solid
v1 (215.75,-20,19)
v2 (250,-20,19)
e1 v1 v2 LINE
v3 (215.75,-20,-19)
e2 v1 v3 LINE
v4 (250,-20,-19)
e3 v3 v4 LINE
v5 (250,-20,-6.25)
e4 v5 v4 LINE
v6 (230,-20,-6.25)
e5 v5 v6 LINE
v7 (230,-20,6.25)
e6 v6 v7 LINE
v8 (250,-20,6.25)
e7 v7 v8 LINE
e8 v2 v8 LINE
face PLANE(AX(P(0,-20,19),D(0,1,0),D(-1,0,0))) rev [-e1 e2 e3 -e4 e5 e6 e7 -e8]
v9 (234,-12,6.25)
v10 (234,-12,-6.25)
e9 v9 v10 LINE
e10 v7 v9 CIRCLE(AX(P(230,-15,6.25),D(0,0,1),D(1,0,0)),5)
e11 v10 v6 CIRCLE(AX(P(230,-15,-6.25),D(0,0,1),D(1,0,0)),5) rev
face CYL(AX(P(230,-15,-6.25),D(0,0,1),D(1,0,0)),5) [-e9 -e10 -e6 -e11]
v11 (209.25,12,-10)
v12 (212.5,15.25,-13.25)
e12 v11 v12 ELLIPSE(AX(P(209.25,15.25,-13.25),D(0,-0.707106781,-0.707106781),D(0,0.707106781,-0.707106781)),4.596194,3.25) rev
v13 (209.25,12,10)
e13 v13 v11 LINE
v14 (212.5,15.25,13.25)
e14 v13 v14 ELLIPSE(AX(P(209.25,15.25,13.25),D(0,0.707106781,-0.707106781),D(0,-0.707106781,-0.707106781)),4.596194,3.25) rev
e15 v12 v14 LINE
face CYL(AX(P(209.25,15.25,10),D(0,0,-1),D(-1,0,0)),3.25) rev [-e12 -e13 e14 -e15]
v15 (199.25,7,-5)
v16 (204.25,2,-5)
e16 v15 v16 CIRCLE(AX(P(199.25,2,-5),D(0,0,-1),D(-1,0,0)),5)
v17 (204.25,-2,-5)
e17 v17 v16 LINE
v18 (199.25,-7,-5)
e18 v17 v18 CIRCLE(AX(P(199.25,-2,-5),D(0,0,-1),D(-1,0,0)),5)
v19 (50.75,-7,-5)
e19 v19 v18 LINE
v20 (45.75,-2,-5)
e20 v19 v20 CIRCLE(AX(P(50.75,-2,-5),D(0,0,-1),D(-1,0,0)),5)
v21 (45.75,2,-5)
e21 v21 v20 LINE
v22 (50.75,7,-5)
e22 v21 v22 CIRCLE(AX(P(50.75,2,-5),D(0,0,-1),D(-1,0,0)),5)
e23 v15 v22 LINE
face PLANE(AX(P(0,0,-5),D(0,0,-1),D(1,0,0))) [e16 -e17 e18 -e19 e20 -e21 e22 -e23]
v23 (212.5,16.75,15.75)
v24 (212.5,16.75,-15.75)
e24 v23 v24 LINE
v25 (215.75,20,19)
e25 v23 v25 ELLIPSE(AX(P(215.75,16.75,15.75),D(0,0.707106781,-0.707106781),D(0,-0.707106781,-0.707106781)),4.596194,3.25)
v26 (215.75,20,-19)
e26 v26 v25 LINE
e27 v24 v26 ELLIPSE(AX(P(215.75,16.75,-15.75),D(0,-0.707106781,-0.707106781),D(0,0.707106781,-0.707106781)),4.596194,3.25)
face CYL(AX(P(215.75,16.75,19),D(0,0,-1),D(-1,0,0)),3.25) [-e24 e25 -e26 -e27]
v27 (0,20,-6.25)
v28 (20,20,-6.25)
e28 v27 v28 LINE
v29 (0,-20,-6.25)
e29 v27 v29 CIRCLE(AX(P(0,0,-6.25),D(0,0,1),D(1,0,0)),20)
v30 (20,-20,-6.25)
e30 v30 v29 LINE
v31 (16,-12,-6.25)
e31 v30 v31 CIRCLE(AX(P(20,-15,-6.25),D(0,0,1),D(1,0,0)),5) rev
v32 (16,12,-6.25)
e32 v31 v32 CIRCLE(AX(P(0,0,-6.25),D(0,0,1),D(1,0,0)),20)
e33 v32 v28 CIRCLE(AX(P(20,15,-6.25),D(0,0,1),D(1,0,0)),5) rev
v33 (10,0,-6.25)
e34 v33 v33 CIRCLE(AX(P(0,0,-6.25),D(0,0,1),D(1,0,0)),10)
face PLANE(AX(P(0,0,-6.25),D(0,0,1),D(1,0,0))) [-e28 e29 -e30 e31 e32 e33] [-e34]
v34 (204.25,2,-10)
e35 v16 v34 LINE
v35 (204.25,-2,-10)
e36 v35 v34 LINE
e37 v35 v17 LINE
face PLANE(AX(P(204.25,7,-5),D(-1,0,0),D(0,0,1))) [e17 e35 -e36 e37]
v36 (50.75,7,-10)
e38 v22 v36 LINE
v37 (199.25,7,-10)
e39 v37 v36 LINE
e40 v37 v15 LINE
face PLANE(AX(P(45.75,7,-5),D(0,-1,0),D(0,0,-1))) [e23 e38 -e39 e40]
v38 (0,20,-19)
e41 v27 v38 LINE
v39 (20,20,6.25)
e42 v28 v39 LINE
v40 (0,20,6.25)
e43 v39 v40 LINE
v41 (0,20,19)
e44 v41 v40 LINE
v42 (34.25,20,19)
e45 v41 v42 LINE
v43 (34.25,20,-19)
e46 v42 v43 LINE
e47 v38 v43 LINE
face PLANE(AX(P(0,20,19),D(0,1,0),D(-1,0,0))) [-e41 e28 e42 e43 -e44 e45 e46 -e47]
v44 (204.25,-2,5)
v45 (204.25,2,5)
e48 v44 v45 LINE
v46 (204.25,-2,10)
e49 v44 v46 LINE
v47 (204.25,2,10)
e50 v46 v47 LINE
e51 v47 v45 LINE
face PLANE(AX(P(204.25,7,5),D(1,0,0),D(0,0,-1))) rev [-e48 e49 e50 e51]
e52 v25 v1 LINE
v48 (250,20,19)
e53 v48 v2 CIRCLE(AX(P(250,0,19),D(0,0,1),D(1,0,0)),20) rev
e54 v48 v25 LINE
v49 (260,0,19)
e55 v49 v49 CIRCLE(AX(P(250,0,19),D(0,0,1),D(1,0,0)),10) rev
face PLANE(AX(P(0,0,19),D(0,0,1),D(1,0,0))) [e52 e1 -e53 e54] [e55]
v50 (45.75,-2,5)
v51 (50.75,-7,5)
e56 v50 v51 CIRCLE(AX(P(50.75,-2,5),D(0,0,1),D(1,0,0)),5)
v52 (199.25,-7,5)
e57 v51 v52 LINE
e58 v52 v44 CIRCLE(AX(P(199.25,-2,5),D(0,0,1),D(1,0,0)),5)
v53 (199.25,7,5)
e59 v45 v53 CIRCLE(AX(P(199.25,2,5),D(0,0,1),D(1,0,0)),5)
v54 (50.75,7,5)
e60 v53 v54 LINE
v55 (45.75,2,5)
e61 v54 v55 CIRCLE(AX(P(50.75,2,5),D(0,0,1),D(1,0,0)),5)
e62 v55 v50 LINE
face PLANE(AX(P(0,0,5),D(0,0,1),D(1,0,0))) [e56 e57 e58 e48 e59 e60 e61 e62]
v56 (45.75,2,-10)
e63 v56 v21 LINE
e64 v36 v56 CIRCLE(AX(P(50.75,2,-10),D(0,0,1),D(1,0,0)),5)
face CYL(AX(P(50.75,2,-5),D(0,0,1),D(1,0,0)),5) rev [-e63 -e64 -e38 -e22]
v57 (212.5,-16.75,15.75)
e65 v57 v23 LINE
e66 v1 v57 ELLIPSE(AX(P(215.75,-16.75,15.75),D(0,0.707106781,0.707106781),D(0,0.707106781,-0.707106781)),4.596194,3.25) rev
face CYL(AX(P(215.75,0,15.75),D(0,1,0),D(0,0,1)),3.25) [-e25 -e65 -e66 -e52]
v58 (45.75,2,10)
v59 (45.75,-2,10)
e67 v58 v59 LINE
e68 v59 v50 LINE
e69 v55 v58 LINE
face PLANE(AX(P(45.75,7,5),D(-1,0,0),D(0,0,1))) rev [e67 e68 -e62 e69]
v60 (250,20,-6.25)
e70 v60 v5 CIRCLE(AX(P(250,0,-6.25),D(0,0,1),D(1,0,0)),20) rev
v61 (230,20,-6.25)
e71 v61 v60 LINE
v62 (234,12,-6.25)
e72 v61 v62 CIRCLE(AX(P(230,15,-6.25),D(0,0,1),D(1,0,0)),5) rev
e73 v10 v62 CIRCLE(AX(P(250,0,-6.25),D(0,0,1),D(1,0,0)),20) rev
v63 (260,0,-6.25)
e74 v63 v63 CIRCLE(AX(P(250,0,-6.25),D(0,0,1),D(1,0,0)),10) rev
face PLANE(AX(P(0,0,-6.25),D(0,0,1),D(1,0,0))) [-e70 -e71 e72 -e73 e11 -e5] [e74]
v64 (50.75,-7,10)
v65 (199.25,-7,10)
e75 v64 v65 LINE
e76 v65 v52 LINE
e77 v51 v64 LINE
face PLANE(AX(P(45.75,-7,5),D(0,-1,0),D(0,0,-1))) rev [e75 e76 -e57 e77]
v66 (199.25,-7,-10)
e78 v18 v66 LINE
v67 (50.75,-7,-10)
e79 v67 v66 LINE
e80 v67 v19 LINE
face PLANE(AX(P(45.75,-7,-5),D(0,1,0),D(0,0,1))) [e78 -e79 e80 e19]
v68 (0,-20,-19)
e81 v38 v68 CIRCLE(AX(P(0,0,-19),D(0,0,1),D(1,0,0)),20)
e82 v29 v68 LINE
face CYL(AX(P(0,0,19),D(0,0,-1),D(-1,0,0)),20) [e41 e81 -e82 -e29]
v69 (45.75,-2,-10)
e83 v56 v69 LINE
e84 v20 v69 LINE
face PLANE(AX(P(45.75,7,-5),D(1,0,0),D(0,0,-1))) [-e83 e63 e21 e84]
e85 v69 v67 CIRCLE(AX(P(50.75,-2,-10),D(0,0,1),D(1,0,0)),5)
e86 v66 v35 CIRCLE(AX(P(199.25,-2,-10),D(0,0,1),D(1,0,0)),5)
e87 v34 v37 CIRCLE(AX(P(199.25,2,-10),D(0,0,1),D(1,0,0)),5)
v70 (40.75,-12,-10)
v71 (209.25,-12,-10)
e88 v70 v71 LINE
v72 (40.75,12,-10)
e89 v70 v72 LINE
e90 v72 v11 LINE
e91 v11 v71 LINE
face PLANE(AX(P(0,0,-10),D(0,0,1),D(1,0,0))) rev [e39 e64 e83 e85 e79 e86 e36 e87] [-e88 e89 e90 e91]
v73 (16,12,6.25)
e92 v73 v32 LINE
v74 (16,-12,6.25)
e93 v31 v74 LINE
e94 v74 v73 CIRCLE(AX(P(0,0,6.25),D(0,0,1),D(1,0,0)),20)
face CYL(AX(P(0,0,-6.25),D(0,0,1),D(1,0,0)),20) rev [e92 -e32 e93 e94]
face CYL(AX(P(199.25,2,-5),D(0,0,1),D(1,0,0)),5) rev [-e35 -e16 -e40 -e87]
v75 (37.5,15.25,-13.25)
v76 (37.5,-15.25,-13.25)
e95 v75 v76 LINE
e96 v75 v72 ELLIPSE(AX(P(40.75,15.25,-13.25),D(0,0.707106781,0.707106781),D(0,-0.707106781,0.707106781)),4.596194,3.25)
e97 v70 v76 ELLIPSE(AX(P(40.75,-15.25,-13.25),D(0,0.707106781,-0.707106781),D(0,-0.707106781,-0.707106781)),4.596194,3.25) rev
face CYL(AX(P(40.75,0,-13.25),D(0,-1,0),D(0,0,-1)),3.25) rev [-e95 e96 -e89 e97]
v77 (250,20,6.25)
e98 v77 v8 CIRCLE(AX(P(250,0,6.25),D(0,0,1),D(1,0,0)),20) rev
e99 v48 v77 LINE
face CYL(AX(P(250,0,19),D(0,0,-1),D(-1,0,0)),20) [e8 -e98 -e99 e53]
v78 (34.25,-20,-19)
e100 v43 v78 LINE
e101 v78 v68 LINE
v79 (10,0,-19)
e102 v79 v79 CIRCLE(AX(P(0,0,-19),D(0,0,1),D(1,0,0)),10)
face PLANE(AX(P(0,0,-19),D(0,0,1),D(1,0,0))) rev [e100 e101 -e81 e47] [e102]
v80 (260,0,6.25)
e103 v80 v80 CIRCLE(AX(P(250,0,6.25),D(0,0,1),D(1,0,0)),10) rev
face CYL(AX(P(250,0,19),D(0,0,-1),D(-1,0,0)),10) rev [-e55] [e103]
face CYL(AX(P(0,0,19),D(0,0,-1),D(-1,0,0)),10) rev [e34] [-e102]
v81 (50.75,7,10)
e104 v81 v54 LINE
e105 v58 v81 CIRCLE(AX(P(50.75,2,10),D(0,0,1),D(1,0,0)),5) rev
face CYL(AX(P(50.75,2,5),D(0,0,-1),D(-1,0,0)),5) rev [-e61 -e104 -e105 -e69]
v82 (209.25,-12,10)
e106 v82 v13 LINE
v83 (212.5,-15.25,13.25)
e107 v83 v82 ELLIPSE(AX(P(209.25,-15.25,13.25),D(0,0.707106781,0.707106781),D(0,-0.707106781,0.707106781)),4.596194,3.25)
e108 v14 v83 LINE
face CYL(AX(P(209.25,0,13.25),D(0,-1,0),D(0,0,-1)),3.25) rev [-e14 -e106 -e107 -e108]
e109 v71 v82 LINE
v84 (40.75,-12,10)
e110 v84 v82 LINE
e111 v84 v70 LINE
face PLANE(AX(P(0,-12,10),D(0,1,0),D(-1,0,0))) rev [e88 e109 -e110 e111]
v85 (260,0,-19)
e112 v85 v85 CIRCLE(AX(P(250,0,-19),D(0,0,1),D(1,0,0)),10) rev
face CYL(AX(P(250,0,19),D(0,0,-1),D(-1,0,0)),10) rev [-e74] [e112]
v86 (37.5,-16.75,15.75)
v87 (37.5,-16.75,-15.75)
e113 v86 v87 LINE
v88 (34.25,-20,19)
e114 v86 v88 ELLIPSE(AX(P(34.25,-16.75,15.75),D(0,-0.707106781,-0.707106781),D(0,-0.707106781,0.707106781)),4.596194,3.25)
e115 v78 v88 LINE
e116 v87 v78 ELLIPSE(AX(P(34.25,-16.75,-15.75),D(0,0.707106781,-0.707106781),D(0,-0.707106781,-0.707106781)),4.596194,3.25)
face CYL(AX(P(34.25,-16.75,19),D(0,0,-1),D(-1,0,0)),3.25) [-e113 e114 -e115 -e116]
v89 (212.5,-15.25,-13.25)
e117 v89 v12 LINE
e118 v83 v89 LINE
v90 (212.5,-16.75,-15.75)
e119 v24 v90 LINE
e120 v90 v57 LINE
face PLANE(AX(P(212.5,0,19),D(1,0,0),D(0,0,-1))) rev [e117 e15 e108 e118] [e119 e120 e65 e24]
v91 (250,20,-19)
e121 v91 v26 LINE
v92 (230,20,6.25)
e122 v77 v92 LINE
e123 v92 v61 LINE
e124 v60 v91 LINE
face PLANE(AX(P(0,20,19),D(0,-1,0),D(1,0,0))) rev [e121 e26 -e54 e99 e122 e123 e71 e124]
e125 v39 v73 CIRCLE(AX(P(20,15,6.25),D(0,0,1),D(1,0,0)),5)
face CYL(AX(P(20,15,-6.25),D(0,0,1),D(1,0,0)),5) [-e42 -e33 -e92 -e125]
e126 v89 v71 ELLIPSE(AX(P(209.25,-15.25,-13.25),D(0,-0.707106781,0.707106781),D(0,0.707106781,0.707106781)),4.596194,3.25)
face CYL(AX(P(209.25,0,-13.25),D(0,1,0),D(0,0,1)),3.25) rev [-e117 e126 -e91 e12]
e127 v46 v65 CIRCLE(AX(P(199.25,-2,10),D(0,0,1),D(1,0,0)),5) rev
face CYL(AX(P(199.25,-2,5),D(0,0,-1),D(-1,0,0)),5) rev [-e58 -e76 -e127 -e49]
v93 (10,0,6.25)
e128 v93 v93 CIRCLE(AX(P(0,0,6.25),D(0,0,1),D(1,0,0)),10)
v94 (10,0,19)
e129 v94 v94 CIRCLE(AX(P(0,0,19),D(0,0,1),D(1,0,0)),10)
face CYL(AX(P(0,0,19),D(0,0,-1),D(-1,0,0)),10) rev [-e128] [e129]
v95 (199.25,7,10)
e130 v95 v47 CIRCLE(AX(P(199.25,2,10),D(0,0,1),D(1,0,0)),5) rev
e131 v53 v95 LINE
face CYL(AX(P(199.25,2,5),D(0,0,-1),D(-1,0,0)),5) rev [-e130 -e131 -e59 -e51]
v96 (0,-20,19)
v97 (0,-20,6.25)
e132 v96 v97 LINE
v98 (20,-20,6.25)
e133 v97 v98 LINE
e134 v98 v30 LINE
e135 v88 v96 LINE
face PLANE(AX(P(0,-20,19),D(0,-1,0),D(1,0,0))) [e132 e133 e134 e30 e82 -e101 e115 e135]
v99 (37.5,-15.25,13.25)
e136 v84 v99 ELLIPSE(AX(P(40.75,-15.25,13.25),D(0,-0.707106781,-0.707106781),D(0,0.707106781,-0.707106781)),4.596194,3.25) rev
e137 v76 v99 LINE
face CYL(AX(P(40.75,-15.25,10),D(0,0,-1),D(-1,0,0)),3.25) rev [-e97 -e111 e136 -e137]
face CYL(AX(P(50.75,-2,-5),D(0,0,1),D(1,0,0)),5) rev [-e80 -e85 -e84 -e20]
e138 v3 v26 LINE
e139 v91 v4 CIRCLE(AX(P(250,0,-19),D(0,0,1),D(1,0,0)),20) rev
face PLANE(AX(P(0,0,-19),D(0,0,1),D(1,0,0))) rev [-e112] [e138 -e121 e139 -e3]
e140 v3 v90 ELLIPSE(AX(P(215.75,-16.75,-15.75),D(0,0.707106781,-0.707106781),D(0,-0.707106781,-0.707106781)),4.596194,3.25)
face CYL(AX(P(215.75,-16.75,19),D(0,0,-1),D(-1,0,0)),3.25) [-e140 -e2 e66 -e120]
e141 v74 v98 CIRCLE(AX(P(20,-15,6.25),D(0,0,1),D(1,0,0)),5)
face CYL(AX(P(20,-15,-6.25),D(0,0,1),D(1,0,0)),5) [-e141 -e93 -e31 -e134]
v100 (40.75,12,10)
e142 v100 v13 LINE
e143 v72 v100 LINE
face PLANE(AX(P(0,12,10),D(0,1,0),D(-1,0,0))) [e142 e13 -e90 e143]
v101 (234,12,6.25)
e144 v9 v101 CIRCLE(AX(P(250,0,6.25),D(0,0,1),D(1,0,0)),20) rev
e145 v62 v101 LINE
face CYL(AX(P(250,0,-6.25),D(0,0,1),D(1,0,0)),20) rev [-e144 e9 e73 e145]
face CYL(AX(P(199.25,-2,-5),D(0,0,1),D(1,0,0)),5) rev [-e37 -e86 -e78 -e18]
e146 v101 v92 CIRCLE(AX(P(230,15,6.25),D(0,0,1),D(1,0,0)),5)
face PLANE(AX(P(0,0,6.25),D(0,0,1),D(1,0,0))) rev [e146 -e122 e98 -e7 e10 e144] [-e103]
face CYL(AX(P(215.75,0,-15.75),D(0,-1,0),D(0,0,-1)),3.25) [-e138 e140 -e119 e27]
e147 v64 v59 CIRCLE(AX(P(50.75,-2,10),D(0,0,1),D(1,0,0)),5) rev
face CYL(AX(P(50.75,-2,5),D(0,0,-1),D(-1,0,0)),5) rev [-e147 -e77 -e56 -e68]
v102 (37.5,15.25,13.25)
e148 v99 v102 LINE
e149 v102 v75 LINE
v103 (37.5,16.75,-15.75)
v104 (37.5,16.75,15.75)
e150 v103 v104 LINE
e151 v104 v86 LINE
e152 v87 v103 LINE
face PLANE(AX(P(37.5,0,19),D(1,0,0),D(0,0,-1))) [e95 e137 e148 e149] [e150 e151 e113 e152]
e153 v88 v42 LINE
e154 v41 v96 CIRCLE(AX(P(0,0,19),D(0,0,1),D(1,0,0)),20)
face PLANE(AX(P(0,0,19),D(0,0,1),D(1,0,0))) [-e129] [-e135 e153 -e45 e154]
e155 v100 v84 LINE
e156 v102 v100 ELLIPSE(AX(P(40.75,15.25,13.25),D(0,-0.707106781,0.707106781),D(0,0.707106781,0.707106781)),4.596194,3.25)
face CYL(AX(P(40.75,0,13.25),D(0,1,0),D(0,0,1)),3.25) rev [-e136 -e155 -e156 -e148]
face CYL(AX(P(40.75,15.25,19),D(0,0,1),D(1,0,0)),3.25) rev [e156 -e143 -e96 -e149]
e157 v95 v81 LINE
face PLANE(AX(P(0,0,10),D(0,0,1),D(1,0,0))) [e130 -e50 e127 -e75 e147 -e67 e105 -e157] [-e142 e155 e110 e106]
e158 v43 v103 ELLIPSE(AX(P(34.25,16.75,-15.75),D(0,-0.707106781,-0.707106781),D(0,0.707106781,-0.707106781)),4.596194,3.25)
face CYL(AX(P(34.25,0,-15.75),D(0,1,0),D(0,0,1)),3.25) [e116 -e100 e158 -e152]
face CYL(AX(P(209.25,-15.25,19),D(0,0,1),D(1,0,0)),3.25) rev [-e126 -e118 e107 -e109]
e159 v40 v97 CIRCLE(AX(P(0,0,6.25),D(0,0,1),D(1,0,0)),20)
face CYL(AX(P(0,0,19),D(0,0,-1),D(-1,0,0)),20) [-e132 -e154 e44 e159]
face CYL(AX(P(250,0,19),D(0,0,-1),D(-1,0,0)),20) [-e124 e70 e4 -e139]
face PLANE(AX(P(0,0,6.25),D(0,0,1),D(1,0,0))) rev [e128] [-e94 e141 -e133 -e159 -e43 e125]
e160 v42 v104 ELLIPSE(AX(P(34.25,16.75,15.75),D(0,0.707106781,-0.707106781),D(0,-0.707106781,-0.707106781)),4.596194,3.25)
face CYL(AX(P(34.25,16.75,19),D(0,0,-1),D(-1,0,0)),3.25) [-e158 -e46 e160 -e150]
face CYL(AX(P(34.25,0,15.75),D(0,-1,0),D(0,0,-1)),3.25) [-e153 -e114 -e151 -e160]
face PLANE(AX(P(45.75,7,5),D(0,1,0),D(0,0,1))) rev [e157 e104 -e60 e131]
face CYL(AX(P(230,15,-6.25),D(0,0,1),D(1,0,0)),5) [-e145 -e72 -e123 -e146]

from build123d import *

# Parameters (mm, degrees)
SKETCH1_W            = 175
SKETCH1_H            = 24
BOSS_EXTRUDE3_DEPTH  = 10
SKETCH1_6_R          = 20
SKETCH1_6_R_2        = 10
HEAD_WIDTH_DEPTH     = 19
SKETCH1_7_R          = 20
SKETCH1_7_R_2        = 10
CUT_EXTRUDE1_DEPTH   = 6.25
FILLET1_START        = -6.25
FILLET1_DEPTH        = 12.5
FILLET2_R            = 3.25
SKETCH2_W            = 158.5
SKETCH2_H            = 14
CUT_EXTRUDE2_DEPTH   = 5
FILLET3_R            = 5
FILLET3_OF_MIRROR1_R = 5


with BuildPart() as part:
    # Sketch1 → Boss-Extrude3 (new, symmetric)
    with BuildSketch(Plane.XY):
        with Locations((125, 0)):
            Rectangle(SKETCH1_W, SKETCH1_H)
    extrude(amount=BOSS_EXTRUDE3_DEPTH, both=True)

    # Sketch1<6> → Head Width (add, symmetric)
    # profile 1 of 4: a face of its own
    with BuildSketch(Plane.XY):
        with BuildLine():
            Line((37.5, -12), (37.5, 12))
            Line((37.5, 12), (37.5, 20))
            Line((37.5, 20), (0, 20))
            ThreePointArc((0, 20), (14.142135624, 14.142135624), (20, 0))
            ThreePointArc((20, 0), (14.142135624, -14.142135624), (0, -20))
            Line((0, -20), (37.5, -20))
            Line((37.5, -20), (37.5, -12))
        make_face()
    # profile 2 of 4: a face of its own
    with BuildSketch(Plane.XY):
        Circle(SKETCH1_6_R)
        Circle(SKETCH1_6_R_2, mode=Mode.SUBTRACT)
    # profile 3 of 4: a face of its own
    with BuildSketch(Plane.XY):
        with BuildLine():
            Line((212.5, 20), (212.5, 12))
            Line((212.5, 12), (212.5, -12))
            Line((212.5, -12), (212.5, -20))
            Line((212.5, -20), (250, -20))
            ThreePointArc((250, -20), (230, 0), (250, 20))
            Line((250, 20), (212.5, 20))
        make_face()
    # profile 4 of 4: a face of its own
    with BuildSketch(Plane.XY):
        with Locations((250, 0)):
            Circle(SKETCH1_6_R)
        with Locations((250, 0)):
            Circle(SKETCH1_6_R_2, mode=Mode.SUBTRACT)
    extrude(amount=HEAD_WIDTH_DEPTH, both=True)

    # Sketch1<7> → Cut-Extrude1 (cut, symmetric)
    # profile 1 of 2: a face of its own
    with BuildSketch(Plane.XY):
        Circle(SKETCH1_7_R)
        Circle(SKETCH1_7_R_2, mode=Mode.SUBTRACT)
    # profile 2 of 2: a face of its own
    with BuildSketch(Plane.XY):
        with Locations((250, 0)):
            Circle(SKETCH1_7_R)
        with Locations((250, 0)):
            Circle(SKETCH1_7_R_2, mode=Mode.SUBTRACT)
    extrude(amount=CUT_EXTRUDE1_DEPTH, both=True, mode=Mode.SUBTRACT)

    # Fillet1: read off the stored shape, not the designer's step
    # Fillet1 outline → Fillet1 (cut)
    with BuildSketch(Plane.XY.offset(FILLET1_START)):
        with BuildLine():
            ThreePointArc((230, 20), (234.472135955, 17.236067977), (234, 12))
            ThreePointArc((234, 12), (241.05572809, 17.88854382), (250, 20))
            Line((250, 20), (230, 20))
        make_face()
        with BuildLine():
            ThreePointArc((234, -12), (234.472135955, -17.236067977), (230, -20))
            Line((230, -20), (250, -20))
            ThreePointArc((250, -20), (241.05572809, -17.88854382), (234, -12))
        make_face()
        with BuildLine():
            ThreePointArc((20, -20), (15.527864045, -17.236067977), (16, -12))
            ThreePointArc((16, -12), (8.94427191, -17.88854382), (0, -20))
            Line((0, -20), (20, -20))
        make_face()
        with BuildLine():
            ThreePointArc((0, 20), (8.94427191, 17.88854382), (16, 12))
            ThreePointArc((16, 12), (15.527864045, 17.236067977), (20, 20))
            Line((20, 20), (0, 20))
        make_face()
    extrude(amount=FILLET1_DEPTH, mode=Mode.SUBTRACT)

    # Fillet2
    fillet2_edges = [part.edges().sort_by_distance(p)[0] for p in [
        (37.5, 0, 10),
        (37.5, 20, 0),
        (37.5, 0, 19),
        (37.5, -20, 0),
        (37.5, 0, -19),
        (212.5, -20, 0),
        (212.5, 0, -19),
        (212.5, 20, 0),
        (212.5, 0, 19),
        (212.5, 0, 10),
        (37.5, 0, -10),
        (212.5, 0, -10),
        (212.5, -12, 0),
        (37.5, -12, 0),
        (37.5, 12, 0),
        (212.5, 12, 0),
    ]]
    fillet(fillet2_edges, radius=FILLET2_R)

    # Sketch2 → Cut-Extrude2 (cut)
    with BuildSketch(Plane.XY.offset(10)):
        with Locations((125, 0)):
            Rectangle(SKETCH2_W, SKETCH2_H)
    cut_extrude2 = extrude(amount=-CUT_EXTRUDE2_DEPTH, mode=Mode.SUBTRACT)

    # Fillet3
    fillet3_edges = [part.edges().sort_by_distance(p)[0] for p in [
        (45.75, -7, 7.5),
        (45.75, 7, 7.5),
        (204.25, 7, 7.5),
        (204.25, -7, 7.5),
    ]]
    fillet(fillet3_edges, radius=FILLET3_R)

    # Mirror1: Cut-Extrude2 across plane
    add(cut_extrude2.mirror(Plane.XY), mode=Mode.SUBTRACT)

    # Fillet3 of Mirror1
    fillet3_of_mirror1_edges = [part.edges().sort_by_distance(p)[0] for p in [
        (45.75, -7, -7.5),
        (45.75, 7, -7.5),
        (204.25, 7, -7.5),
        (204.25, -7, -7.5),
    ]]
    fillet(fillet3_of_mirror1_edges, radius=FILLET3_OF_MIRROR1_R)


solid = part.part
